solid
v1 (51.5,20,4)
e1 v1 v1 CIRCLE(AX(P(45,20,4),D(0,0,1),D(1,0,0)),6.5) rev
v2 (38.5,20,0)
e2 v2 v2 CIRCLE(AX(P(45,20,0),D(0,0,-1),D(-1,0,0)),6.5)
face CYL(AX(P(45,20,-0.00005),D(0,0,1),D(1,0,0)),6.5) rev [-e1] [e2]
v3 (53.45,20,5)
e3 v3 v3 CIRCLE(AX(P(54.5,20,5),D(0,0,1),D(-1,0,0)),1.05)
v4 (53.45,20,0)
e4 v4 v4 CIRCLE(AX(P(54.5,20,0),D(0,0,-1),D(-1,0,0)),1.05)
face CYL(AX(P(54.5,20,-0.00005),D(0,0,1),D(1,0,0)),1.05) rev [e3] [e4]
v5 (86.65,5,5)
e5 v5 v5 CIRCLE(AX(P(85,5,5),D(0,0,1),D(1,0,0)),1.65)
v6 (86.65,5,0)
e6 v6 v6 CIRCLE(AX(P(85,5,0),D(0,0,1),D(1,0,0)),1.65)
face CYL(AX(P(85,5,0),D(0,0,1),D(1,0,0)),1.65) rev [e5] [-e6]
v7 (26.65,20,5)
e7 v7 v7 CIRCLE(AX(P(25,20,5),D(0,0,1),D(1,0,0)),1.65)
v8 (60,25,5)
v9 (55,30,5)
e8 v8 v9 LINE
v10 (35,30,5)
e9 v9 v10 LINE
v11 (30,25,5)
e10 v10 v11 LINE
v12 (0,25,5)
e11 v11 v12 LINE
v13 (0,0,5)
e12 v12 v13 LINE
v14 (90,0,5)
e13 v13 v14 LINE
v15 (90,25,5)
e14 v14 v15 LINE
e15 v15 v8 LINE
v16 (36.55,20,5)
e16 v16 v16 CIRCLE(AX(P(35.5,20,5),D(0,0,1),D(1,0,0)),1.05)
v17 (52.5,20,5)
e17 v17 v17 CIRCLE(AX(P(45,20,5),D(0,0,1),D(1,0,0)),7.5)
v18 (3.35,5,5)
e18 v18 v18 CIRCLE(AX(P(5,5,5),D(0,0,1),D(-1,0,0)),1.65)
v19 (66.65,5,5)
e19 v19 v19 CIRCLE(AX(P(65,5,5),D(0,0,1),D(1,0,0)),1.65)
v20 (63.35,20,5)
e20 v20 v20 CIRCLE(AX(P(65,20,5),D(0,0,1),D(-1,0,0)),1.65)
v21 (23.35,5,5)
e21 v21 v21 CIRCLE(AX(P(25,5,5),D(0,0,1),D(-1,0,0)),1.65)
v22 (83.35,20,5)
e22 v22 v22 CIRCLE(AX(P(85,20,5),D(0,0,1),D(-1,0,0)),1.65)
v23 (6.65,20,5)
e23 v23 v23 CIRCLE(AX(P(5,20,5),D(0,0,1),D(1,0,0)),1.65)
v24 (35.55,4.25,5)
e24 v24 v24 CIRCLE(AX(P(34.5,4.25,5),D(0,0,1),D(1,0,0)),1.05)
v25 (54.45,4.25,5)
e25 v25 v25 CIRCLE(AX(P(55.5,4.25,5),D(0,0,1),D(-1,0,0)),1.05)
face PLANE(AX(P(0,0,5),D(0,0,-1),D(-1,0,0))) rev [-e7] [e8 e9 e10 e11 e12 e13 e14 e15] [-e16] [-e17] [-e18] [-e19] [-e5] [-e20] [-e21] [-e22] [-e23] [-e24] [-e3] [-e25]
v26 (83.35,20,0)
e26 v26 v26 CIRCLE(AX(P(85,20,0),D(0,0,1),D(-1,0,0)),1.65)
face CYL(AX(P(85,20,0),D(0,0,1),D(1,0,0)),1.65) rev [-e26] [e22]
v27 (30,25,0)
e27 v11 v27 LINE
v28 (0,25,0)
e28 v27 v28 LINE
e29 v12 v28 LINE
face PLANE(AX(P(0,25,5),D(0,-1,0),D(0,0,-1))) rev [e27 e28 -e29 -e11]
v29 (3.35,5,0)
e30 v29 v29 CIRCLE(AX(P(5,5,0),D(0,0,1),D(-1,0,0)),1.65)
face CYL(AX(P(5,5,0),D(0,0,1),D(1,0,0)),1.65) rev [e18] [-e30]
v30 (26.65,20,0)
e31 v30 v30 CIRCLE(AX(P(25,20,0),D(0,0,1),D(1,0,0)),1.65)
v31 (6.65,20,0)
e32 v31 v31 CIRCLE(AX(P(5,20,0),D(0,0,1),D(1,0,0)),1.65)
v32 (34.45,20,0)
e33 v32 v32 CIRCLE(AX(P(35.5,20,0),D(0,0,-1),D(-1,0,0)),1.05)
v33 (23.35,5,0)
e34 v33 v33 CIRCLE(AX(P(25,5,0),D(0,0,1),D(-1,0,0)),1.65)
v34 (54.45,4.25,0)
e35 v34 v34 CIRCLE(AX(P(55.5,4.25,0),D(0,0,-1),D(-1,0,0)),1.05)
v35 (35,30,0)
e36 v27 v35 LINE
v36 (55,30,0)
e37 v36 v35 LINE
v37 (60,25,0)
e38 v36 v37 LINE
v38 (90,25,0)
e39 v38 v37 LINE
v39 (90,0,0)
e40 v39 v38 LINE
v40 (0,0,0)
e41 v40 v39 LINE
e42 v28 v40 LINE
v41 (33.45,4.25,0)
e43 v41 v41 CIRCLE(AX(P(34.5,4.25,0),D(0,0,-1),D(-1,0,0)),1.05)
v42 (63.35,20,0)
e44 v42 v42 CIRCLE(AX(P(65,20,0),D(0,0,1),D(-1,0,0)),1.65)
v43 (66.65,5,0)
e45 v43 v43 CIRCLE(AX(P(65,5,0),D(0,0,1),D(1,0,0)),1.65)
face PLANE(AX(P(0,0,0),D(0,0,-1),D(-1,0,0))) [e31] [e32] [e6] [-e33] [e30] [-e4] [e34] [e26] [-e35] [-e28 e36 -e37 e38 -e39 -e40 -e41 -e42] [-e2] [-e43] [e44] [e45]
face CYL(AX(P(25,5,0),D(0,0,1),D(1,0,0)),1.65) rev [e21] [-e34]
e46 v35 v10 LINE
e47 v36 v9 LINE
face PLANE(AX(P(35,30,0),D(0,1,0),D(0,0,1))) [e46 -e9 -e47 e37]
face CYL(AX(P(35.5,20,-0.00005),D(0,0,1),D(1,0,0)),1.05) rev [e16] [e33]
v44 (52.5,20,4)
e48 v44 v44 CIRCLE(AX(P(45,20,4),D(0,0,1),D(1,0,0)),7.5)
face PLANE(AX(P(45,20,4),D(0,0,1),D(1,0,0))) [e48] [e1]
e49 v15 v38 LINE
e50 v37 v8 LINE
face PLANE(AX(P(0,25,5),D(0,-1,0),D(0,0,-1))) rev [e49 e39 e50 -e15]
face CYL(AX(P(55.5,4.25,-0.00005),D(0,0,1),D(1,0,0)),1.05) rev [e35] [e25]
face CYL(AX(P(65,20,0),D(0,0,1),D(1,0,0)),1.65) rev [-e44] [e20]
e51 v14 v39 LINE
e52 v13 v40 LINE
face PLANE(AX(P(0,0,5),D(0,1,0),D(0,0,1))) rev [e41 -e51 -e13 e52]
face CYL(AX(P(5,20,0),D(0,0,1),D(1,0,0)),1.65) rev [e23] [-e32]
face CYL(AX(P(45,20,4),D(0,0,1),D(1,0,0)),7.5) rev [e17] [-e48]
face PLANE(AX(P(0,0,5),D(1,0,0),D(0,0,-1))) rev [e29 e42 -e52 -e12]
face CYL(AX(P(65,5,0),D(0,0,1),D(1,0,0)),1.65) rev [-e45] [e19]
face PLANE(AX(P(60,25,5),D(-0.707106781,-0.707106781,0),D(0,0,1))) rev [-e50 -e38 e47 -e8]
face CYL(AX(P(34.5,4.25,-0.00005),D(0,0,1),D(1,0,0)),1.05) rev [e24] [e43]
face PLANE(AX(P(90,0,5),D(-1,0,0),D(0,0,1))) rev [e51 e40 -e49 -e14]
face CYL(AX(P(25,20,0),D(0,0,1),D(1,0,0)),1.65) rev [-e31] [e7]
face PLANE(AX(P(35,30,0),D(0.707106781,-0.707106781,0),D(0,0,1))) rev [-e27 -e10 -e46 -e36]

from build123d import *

# Parameters (mm, degrees)
ESQUISSE1_W             = 90
ESQUISSE1_H             = 25
BOSS_EXTRU_1_DEPTH      = 5
ESQUISSE6_W             = 20
ESQUISSE6_H             = 5
BOSS_EXTRU_2_DEPTH      = 5
ESQUISSE3_R             = 6.5
ENL_V_MAT_EXTRU_2_DEPTH = 96
ESQUISSE4_R             = 1.05
ENL_V_MAT_EXTRU_3_DEPTH = 96
ESQUISSE5_R             = 1.65
ENL_V_MAT_EXTRU_4_DEPTH = 5
CHANFREIN1_SIZE         = 5
ESQUISSE7_R             = 7.5
ENL_V_MAT_EXTRU_5_DEPTH = 1


with BuildPart() as part:
    # Esquisse1 → Boss.-Extru.1 (new body)
    with BuildSketch(Plane.XY):
        with Locations((45, 12.5)):
            Rectangle(ESQUISSE1_W, ESQUISSE1_H)
    extrude(amount=BOSS_EXTRU_1_DEPTH)

    # Esquisse6 → Boss.-Extru.2 (add)
    with BuildSketch(Plane.XY.offset(5)):
        with Locations((45, 27.5)):
            Rectangle(ESQUISSE6_W, ESQUISSE6_H)
    extrude(amount=-BOSS_EXTRU_2_DEPTH)

    # Esquisse3 → Enlèv. mat.-Extru.2 (cut, through all)
    with BuildSketch(Plane.XY.offset(5)):
        with Locations((45, 20)):
            Circle(ESQUISSE3_R)
    extrude(amount=-ENL_V_MAT_EXTRU_2_DEPTH, mode=Mode.SUBTRACT)

    # Esquisse4 → Enlèv. mat.-Extru.3 (cut, through all)
    with BuildSketch(Plane.XY.offset(5)):
        with Locations((34.5, 4.25)):
            Circle(ESQUISSE4_R)
        with Locations(Location((54.5, 20, 0), (0, 0, 180))):
            Circle(ESQUISSE4_R)
        with Locations(Location((55.5, 4.25, 0), (0, 0, 180))):
            Circle(ESQUISSE4_R)
        with Locations((35.5, 20)):
            Circle(ESQUISSE4_R)
    extrude(amount=-ENL_V_MAT_EXTRU_3_DEPTH, mode=Mode.SUBTRACT)

    # Esquisse5 → Enlèv. mat.-Extru.4 (cut)
    with BuildSketch(Plane.XY.offset(5)):
        with Locations((5, 20)):
            Circle(ESQUISSE5_R)
        with Locations((25, 20)):
            Circle(ESQUISSE5_R)
        with Locations(Location((25, 5, 0), (0, 0, 180))):
            Circle(ESQUISSE5_R)
        with Locations(Location((5, 5, 0), (0, 0, 180))):
            Circle(ESQUISSE5_R)
        with Locations((85, 5)):
            Circle(ESQUISSE5_R)
        with Locations((65, 5)):
            Circle(ESQUISSE5_R)
        with Locations(Location((65, 20, 0), (0, 0, 180))):
            Circle(ESQUISSE5_R)
        with Locations(Location((85, 20, 0), (0, 0, 180))):
            Circle(ESQUISSE5_R)
    extrude(amount=-ENL_V_MAT_EXTRU_4_DEPTH, mode=Mode.SUBTRACT)

    # Chanfrein1
    chanfrein1_edges = [part.edges().sort_by_distance(p)[0] for p in [
        (55, 25, 2.5),
        (35, 25, 2.5),
    ]]
    chamfer(chanfrein1_edges, length=CHANFREIN1_SIZE - 0.0001)  # a hair under: the kernel refuses the full size

    # Esquisse7 → Enlèv. mat.-Extru.5 (cut)
    with BuildSketch(Plane.XY.offset(5)):
        with Locations((45, 20)):
            Circle(ESQUISSE7_R)
    extrude(amount=-ENL_V_MAT_EXTRU_5_DEPTH, mode=Mode.SUBTRACT)


solid = part.part
